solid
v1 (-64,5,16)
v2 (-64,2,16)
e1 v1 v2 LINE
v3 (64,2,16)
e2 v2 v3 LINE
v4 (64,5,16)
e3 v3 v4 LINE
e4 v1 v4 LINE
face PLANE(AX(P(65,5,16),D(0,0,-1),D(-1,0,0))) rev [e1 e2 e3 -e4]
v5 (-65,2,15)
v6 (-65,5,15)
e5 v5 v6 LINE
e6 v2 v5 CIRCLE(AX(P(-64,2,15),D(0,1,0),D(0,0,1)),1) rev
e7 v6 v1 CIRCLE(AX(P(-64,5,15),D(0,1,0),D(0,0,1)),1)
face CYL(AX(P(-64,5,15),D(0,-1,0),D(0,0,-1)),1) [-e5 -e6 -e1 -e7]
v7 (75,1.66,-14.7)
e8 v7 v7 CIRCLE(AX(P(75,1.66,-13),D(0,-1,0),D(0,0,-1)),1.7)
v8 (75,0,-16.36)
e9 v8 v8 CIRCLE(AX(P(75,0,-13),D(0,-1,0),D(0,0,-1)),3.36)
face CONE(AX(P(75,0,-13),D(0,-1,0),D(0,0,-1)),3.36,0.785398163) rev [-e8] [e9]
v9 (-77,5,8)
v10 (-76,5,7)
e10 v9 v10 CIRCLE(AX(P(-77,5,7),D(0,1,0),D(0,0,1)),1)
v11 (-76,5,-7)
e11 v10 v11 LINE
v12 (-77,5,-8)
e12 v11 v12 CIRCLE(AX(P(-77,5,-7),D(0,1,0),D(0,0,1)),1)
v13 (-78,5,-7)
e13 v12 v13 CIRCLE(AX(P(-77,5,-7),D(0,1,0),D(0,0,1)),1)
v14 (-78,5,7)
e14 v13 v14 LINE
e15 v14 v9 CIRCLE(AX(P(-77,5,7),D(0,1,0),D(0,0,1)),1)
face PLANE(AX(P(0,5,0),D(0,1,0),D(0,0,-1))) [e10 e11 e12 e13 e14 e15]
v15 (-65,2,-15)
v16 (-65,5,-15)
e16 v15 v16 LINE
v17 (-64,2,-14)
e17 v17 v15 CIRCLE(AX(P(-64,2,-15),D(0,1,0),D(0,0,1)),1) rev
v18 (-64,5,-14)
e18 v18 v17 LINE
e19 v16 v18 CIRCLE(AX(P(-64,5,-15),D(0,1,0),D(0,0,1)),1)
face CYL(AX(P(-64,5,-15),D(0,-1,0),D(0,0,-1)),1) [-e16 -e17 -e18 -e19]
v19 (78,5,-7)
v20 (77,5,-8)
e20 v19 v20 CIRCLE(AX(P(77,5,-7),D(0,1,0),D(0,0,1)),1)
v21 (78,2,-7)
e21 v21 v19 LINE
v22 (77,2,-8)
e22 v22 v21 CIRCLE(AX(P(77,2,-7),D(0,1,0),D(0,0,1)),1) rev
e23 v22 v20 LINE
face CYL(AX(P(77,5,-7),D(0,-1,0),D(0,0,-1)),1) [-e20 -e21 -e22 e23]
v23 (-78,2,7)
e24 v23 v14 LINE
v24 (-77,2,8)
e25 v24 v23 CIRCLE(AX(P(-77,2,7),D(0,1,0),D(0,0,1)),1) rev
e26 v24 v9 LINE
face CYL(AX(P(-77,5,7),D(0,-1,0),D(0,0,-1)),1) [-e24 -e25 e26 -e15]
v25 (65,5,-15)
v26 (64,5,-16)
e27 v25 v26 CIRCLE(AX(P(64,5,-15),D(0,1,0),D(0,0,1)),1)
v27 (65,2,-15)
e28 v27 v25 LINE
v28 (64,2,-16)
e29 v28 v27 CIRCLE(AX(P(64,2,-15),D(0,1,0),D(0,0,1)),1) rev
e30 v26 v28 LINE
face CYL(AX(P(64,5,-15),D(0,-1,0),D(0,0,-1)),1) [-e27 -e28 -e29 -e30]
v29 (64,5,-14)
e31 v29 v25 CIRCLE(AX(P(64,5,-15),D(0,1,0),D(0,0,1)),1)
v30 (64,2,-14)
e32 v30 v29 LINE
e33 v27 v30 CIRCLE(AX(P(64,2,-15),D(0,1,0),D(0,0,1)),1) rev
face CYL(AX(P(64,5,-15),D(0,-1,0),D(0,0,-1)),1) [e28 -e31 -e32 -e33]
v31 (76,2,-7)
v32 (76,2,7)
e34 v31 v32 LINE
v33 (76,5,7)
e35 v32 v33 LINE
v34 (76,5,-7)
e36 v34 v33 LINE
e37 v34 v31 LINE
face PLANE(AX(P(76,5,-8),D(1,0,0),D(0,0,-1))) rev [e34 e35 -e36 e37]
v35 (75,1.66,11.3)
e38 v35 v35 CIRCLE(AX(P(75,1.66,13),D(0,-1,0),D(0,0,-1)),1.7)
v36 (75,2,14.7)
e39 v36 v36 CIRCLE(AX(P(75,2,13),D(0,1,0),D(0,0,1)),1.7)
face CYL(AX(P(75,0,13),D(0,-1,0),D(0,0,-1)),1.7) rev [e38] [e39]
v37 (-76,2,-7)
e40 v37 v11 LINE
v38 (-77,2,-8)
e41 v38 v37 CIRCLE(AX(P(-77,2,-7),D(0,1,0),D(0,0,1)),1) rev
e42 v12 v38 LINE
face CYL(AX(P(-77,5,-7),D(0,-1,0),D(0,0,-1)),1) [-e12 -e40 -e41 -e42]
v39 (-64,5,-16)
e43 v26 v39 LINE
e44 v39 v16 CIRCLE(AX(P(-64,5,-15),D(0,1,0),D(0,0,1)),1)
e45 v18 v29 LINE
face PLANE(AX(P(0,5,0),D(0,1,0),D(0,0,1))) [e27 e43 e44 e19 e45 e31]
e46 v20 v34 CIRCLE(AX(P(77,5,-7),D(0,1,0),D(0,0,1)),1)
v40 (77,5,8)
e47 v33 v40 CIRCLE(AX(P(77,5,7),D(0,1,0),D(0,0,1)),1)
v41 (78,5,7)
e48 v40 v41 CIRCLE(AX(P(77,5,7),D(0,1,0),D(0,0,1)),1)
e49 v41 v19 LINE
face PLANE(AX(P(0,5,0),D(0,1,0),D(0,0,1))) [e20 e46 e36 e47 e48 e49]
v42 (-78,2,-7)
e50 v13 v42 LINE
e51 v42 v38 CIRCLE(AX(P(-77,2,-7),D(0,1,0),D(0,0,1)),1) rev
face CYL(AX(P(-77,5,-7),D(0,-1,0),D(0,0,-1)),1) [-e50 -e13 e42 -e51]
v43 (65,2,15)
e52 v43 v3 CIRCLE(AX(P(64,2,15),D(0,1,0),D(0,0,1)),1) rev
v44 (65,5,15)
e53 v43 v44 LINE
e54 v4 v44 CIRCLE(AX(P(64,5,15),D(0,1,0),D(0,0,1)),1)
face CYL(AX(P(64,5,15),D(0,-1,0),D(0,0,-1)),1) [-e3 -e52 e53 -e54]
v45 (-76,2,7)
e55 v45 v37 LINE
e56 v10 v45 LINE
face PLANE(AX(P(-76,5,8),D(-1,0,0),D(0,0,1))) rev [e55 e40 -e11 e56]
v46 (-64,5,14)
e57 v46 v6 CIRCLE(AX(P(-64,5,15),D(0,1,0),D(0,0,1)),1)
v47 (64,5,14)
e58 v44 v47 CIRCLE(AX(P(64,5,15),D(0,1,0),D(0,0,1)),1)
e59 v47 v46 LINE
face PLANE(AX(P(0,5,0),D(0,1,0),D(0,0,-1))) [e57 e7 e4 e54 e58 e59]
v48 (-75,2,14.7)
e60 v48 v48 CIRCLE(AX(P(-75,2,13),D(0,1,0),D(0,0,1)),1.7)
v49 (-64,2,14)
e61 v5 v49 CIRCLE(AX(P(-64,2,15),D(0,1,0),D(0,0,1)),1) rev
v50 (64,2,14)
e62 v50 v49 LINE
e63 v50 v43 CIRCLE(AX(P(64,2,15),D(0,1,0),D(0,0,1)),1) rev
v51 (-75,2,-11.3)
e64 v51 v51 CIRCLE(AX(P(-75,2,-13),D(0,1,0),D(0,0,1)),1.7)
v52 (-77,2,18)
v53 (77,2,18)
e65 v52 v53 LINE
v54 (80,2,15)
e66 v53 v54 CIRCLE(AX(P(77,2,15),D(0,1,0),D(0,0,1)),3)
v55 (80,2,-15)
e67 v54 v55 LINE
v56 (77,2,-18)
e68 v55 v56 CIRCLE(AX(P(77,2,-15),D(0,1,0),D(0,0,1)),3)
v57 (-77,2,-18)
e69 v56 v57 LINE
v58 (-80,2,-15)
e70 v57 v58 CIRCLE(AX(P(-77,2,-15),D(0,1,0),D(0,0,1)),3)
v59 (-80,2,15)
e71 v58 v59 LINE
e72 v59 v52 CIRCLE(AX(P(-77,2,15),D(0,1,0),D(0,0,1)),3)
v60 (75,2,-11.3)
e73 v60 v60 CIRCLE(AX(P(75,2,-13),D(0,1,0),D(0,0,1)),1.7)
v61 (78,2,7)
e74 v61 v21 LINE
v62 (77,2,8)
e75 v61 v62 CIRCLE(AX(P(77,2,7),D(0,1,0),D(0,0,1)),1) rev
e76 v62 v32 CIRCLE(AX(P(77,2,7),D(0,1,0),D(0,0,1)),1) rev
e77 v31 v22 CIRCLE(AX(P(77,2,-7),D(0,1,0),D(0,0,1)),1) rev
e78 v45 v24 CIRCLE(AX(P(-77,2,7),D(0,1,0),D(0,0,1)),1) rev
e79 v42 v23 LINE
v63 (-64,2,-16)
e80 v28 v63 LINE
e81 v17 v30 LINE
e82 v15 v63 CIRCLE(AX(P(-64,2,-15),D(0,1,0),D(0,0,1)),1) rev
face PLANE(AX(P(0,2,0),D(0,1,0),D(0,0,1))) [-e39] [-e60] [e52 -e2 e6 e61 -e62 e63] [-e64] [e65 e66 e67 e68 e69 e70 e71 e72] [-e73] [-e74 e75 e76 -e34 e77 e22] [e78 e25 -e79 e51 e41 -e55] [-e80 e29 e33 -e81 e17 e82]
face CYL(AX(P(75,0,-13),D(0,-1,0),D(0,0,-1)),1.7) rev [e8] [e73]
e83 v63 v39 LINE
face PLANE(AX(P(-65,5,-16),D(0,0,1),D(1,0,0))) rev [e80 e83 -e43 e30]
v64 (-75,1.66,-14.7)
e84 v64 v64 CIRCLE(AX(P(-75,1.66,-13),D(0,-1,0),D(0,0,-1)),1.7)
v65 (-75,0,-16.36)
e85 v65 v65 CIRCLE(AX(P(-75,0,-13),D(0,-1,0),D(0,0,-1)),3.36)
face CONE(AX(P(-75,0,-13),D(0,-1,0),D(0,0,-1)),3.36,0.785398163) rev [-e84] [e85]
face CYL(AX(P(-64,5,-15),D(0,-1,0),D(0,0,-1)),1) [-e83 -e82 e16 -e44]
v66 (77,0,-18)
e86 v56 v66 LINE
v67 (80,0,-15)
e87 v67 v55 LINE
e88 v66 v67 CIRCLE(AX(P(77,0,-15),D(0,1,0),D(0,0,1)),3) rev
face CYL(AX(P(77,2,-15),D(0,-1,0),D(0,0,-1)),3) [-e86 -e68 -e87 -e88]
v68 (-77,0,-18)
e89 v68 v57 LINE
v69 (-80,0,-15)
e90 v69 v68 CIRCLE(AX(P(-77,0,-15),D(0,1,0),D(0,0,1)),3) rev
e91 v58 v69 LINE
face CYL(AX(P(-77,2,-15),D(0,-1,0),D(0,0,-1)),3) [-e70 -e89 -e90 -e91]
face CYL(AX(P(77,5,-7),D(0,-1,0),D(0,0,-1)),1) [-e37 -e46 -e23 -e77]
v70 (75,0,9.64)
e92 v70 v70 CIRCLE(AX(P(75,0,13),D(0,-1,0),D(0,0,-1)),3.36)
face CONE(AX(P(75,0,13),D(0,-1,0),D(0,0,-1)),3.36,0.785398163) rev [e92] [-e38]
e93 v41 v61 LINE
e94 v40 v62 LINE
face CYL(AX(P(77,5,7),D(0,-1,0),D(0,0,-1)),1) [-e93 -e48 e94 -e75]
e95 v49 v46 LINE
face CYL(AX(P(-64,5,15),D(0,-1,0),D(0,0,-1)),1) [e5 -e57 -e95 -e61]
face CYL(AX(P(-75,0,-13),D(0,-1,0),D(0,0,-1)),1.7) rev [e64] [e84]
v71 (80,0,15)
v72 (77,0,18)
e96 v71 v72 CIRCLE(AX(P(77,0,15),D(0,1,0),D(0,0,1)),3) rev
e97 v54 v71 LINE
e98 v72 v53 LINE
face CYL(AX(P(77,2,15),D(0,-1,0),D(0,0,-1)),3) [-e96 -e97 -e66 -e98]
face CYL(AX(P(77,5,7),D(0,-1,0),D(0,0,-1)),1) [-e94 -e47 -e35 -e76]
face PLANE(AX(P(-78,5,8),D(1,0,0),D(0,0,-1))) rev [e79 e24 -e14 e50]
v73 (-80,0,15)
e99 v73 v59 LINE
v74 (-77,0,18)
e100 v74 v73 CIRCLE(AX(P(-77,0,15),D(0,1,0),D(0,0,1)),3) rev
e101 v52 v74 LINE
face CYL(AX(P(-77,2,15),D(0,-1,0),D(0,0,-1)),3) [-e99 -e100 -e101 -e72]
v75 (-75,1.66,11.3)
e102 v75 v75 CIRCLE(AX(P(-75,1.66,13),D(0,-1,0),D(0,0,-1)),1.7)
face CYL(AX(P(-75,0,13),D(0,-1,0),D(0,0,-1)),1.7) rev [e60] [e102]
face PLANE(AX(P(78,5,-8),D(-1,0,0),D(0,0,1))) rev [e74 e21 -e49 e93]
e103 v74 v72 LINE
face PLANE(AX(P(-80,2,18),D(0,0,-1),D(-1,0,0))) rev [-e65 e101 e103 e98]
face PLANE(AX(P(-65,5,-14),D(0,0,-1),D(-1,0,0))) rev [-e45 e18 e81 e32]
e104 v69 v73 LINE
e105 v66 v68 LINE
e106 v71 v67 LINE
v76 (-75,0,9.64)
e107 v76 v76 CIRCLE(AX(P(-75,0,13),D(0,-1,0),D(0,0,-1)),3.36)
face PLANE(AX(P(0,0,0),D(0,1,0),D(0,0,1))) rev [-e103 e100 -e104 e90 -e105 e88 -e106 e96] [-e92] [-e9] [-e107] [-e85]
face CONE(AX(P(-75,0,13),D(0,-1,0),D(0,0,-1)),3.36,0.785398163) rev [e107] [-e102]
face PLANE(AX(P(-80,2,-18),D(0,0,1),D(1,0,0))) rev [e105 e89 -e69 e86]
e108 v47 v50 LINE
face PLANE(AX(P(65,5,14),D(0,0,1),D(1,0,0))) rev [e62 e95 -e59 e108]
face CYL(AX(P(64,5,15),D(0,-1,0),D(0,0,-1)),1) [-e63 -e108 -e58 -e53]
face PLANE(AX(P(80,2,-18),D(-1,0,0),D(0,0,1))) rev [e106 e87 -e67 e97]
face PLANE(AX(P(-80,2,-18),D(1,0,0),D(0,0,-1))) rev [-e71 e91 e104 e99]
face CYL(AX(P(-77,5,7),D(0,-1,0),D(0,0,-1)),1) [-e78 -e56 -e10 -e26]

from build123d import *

# Parameters (mm, degrees)
SKETCH1_W                    = 160
SKETCH1_H                    = 36
BOSS_EXTRUDE1_DEPTH          = 2
SKETCH2_W                    = 130
SKETCH2_H                    = 2
SKETCH2_W_2                  = 2
SKETCH2_H_2                  = 16
BOSS_EXTRUDE2_DEPTH          = 3
CSK_FOR_M3_SFHCS1_AT_2_COUNT = 2
CSK_FOR_M3_SFHCS1_AT_2_PITCH = 26
CIRPATTERN1_COUNT            = 2
FILLET1_R                    = 3
FILLET2_R                    = 1


with BuildPart() as part:
    # Sketch1 → Boss-Extrude1 (new body)
    with BuildSketch(Plane(origin=(0, 0, 0), x_dir=(1, 0, 0), z_dir=(0, 1, 0))):
        Rectangle(SKETCH1_W, SKETCH1_H)
    extrude(amount=BOSS_EXTRUDE1_DEPTH)

    # Sketch2 → Boss-Extrude2 (add)
    with BuildSketch(Plane(origin=(0, 2, 0), x_dir=(1, 0, 0), z_dir=(0, 1, 0))):
        with Locations((0, 15)):
            Rectangle(SKETCH2_W, SKETCH2_H)
        with Locations((77, 0)):
            Rectangle(SKETCH2_W_2, SKETCH2_H_2)
    boss_extrude2 = extrude(amount=BOSS_EXTRUDE2_DEPTH)

    # Sketch7 → CSK for M3 SFHCS1 (revolve, cut)
    with BuildSketch(Plane(origin=(75, 0, -13), x_dir=(0, 0, -1), z_dir=(1, 0, 0))):
        Polygon((0, 0), (0, 11.021463052), (1.7, 10), (1.7, 1.66), (3.36, 0), align=None)
    csk_for_m3_sfhcs1 = revolve(axis=Axis((75, -6.35, -13), (0, 1, 0)), mode=Mode.SUBTRACT)

    # CSK for M3 SFHCS1 at 2: CSK for M3 SFHCS1 ×2
    with Locations(*[(0, 0, i * CSK_FOR_M3_SFHCS1_AT_2_PITCH) for i in range(1, CSK_FOR_M3_SFHCS1_AT_2_COUNT)]):
        add(csk_for_m3_sfhcs1, mode=Mode.SUBTRACT)

    # CirPattern1: Boss-Extrude2, CSK for M3 SFHCS1 ×2 about axis
    cirpattern1_axis = Axis((0, 0, 0), (0, 1, 0))
    add([boss_extrude2.rotate(cirpattern1_axis, i * 360 / CIRPATTERN1_COUNT) for i in range(1, CIRPATTERN1_COUNT)])
    add([csk_for_m3_sfhcs1.rotate(cirpattern1_axis, i * 360 / CIRPATTERN1_COUNT) for i in range(1, CIRPATTERN1_COUNT)], mode=Mode.SUBTRACT)

    # CirPattern1 copy 1 sketch → CirPattern1 copy 1 (revolve, cut)
    with BuildSketch(Plane(origin=(-75, 0, -13), x_dir=(0, 0, 1), z_dir=(-1, 0, 0))):
        Polygon((0, 0), (0, 11.021463052), (1.7, 10), (1.7, 1.66), (3.36, 0), align=None)
    revolve(axis=Axis((-75, -6.35, -13), (0, 1, 0)), mode=Mode.SUBTRACT)

    # Fillet1
    fillet1_edges = [part.edges().sort_by_distance(p)[0] for p in [
        (-80, 1, -18),
        (80, 1, -18),
        (80, 1, 18),
        (-80, 1, 18),
    ]]
    fillet(fillet1_edges, radius=FILLET1_R)

    # Fillet2
    fillet2_edges = [part.edges().sort_by_distance(p)[0] for p in [
        (-78, 3.5, -8),
        (-78, 3.5, 8),
        (-76, 3.5, 8),
        (-76, 3.5, -8),
        (-65, 3.5, 14),
        (-65, 3.5, 16),
        (65, 3.5, 16),
        (65, 3.5, 14),
        (78, 3.5, 8),
        (78, 3.5, -8),
        (76, 3.5, -8),
        (76, 3.5, 8),
        (65, 3.5, -14),
        (65, 3.5, -16),
        (-65, 3.5, -16),
        (-65, 3.5, -14),
    ]]
    fillet(fillet2_edges, radius=FILLET2_R - 0.0001)  # a hair under: the kernel refuses the full size


solid = part.part
